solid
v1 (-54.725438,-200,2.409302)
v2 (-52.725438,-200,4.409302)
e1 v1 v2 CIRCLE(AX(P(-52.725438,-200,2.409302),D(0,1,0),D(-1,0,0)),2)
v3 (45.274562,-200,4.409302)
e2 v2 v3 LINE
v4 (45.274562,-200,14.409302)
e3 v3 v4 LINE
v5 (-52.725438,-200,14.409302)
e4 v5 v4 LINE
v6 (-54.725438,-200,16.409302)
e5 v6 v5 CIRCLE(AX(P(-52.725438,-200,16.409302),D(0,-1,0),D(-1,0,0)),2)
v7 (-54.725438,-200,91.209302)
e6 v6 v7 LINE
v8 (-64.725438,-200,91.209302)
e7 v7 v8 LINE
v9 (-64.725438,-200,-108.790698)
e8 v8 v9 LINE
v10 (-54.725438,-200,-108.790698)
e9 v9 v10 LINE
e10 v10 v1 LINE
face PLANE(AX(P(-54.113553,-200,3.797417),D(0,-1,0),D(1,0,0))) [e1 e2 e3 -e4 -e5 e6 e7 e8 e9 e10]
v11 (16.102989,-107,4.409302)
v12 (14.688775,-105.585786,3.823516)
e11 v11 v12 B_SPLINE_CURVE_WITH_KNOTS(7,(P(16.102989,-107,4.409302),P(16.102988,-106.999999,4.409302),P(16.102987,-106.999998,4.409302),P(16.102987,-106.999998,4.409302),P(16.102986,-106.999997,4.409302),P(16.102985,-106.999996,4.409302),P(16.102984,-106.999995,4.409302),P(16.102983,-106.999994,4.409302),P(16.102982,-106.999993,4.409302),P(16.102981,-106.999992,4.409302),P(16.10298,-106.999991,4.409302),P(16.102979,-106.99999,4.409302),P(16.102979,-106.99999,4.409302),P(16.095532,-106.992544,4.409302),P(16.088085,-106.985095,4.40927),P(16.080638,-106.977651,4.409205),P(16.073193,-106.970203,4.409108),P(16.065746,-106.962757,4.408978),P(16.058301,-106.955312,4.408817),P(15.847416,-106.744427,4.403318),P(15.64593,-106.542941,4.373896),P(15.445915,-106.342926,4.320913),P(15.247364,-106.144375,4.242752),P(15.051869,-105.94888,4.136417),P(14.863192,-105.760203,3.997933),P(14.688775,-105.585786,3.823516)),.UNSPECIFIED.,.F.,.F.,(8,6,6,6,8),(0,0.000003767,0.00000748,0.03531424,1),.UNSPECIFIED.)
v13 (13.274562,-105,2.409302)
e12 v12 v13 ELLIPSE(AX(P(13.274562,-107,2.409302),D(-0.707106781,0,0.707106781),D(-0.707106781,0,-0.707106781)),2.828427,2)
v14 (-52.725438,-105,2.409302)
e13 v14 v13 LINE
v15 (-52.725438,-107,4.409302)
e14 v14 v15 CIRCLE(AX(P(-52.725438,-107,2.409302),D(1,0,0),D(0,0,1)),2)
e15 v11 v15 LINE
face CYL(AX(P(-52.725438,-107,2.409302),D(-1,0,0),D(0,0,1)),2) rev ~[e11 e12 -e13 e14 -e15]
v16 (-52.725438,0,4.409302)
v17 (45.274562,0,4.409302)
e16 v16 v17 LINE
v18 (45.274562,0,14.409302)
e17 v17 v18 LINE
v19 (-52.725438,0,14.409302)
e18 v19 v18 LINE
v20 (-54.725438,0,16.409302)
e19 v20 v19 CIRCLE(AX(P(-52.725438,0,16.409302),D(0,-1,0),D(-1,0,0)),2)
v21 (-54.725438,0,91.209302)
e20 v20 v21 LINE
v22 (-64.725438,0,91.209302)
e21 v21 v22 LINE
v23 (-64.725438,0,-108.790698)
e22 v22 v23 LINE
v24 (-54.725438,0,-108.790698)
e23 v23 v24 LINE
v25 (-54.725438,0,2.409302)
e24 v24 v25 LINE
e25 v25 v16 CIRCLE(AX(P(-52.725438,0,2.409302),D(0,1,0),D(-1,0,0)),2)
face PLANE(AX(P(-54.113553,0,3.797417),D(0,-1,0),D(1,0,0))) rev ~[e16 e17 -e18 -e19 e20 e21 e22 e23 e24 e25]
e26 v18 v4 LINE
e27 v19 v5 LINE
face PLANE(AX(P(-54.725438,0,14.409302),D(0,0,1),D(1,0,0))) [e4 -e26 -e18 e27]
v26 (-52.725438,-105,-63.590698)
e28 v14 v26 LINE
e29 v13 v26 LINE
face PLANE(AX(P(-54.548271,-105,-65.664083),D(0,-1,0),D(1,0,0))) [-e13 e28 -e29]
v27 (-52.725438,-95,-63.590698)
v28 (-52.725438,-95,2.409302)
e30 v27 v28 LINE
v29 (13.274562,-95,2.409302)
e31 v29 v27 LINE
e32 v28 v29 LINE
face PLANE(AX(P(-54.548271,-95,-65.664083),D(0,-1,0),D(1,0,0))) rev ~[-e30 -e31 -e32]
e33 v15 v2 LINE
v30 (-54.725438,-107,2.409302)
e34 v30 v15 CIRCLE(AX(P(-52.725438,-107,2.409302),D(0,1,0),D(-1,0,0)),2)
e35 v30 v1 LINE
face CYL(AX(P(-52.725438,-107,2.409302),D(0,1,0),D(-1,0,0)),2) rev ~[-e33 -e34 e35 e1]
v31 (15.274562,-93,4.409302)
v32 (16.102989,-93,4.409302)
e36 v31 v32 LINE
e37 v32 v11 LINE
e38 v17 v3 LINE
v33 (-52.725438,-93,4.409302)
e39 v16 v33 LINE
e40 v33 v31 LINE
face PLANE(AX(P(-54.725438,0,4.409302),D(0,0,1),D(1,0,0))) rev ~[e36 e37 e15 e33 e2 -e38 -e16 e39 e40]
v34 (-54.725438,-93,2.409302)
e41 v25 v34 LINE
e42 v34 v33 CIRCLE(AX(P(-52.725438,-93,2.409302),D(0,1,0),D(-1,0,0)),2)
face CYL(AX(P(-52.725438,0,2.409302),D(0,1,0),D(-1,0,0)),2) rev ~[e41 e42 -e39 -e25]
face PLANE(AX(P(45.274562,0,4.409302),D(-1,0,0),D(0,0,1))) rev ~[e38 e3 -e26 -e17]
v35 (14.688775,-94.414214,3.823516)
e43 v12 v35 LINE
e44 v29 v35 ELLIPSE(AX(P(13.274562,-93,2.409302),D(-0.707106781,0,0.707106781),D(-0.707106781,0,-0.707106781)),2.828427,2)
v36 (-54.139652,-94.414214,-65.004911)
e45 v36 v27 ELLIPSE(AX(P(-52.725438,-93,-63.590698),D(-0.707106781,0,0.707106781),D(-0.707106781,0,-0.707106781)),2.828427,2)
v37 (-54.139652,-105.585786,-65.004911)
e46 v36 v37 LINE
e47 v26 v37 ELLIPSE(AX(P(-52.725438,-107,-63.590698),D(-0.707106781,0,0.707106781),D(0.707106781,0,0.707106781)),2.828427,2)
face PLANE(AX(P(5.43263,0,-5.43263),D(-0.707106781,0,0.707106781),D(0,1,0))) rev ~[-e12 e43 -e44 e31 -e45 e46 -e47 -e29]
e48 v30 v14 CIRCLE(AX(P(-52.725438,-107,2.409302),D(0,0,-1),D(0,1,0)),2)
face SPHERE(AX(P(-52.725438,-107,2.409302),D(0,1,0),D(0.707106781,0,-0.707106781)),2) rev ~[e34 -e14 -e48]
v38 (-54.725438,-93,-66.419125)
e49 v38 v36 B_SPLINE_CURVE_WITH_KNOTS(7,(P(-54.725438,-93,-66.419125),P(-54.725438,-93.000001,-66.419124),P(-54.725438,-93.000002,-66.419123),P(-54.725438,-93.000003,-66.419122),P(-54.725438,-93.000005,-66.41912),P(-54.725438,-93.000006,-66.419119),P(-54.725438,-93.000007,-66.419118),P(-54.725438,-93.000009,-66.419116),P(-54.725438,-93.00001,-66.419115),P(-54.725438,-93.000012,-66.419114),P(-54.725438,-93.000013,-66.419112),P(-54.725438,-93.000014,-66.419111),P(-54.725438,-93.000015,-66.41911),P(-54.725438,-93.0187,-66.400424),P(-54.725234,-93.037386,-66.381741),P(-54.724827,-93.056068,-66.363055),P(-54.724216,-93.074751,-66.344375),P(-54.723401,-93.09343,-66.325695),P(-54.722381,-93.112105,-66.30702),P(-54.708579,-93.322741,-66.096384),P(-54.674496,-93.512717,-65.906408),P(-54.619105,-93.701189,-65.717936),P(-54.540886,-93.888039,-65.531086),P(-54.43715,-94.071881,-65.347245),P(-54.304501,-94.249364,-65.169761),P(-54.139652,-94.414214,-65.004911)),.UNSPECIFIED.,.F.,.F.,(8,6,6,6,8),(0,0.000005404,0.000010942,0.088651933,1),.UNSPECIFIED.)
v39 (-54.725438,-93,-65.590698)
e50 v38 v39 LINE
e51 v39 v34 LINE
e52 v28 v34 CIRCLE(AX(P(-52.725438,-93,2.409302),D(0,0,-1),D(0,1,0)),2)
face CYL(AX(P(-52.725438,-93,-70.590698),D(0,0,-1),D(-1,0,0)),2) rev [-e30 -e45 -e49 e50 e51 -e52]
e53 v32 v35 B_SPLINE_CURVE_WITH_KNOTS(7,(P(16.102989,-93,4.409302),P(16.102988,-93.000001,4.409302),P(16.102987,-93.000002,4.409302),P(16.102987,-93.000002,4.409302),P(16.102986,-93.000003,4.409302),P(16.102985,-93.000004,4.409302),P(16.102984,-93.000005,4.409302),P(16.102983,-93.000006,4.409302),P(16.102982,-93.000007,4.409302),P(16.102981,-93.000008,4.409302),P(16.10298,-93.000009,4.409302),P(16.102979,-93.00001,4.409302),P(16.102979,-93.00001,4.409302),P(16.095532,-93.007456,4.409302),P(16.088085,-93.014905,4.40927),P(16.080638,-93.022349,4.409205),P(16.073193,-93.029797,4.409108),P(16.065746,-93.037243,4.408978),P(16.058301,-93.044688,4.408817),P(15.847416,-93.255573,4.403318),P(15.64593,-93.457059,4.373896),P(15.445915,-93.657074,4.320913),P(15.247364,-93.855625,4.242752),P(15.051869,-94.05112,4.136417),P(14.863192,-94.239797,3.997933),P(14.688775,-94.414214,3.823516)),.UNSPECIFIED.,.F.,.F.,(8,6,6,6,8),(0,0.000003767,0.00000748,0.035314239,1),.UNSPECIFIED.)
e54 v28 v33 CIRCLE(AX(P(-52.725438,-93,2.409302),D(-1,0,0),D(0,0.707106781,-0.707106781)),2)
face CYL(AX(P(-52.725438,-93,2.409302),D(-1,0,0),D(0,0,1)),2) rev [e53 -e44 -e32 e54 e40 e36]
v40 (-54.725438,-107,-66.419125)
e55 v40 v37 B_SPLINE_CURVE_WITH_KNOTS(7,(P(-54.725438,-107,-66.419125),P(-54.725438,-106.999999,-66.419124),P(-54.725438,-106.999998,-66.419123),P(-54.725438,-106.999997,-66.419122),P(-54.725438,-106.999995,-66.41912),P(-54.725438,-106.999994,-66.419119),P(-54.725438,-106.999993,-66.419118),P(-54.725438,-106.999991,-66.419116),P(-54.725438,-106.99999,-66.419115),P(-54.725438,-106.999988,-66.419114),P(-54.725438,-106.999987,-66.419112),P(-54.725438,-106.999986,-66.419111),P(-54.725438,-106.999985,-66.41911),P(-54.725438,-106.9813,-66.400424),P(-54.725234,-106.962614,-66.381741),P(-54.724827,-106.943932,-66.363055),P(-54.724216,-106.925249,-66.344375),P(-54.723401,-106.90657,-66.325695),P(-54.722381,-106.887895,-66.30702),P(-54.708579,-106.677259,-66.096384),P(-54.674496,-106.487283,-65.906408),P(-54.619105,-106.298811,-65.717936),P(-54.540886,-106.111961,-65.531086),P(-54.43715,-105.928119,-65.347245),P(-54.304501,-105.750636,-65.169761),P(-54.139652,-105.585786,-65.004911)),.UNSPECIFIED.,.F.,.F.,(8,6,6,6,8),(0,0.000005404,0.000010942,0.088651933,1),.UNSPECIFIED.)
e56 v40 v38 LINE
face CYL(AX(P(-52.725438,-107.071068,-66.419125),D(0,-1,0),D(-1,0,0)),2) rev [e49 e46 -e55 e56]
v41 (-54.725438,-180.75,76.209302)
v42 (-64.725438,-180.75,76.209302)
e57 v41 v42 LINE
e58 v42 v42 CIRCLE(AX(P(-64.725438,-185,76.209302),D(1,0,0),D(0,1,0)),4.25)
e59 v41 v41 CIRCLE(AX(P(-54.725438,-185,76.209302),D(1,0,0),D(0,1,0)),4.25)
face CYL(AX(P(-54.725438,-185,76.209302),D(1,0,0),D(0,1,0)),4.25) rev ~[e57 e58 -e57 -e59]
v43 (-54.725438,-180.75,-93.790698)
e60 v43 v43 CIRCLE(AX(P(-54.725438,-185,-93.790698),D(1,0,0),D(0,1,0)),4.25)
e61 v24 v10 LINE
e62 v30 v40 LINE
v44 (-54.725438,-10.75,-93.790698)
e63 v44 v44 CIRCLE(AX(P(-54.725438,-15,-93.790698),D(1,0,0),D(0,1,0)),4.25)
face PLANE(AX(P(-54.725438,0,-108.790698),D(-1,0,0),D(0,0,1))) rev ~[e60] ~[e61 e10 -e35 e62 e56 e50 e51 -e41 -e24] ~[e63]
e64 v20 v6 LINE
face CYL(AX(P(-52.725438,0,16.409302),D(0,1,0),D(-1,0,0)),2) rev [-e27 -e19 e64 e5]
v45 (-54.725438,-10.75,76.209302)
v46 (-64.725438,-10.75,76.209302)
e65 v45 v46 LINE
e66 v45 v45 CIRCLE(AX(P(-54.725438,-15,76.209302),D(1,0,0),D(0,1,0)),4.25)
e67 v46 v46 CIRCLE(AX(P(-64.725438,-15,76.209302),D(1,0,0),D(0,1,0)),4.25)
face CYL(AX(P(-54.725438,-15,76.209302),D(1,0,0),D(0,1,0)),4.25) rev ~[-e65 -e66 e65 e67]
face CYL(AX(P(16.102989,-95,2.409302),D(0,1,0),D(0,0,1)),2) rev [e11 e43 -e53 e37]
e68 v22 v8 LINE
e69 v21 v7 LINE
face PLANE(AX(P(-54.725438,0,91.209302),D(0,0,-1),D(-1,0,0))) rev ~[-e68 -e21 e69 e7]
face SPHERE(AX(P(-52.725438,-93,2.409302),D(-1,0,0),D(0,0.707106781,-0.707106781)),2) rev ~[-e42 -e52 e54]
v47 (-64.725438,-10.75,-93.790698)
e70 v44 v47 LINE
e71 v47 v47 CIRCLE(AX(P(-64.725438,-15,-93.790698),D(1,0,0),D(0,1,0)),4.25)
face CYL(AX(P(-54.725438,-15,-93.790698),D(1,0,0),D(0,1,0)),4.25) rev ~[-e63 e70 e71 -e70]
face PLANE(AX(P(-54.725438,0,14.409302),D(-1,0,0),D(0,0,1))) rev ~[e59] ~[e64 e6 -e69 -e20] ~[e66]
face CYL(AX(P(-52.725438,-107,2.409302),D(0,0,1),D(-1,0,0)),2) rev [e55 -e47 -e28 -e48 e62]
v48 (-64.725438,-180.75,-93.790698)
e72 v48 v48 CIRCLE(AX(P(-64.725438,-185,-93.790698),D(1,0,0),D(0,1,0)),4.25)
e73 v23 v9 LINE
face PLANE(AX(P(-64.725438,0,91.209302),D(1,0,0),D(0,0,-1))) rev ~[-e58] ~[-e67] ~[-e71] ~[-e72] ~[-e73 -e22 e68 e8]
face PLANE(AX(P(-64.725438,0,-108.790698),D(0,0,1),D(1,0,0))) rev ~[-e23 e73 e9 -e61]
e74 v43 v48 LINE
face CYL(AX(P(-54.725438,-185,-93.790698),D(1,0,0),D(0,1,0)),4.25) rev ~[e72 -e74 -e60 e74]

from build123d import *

# Parameters (mm, degrees)
F0_W         = 100
F0_H         = 10
F1_DEPTH     = 200
F2_W         = 10
F2_H         = 70
F3_DEPTH     = 70
F5_DEPTH     = 25
F6_R         = 4.25
F7_DEPTH     = 25
F8_DEPTH     = 25
F9_T1_DEPTH  = 200
F9_T3_DEPTH  = 93
F9_T5_DEPTH  = 93
F9_T7_DEPTH  = 10
F9_S11_W     = 2
F9_S11_H     = 2
F9_T12_DEPTH = 2
F9_S17_W     = 2
F9_S17_H     = 2
F9_T18_DEPTH = 2
F9_T24_DEPTH = 73
F9_T29_DEPTH = 73
F9_T34_DEPTH = 73
F9_T39_DEPTH = 73
F9_T45_DEPTH = 73
F9_T49_DEPTH = 12.0710678119
F9_T56_DEPTH = 12.0710678119
F9_T60_DEPTH = 73
F9_T67_DEPTH = 73
F9_T71_DEPTH = 12.0710678119
F9_T78_DEPTH = 12.0710678119
F9_T82_DEPTH = 73


# Not quite as in the source:
# - a fillet or chamfer that OpenCascade refuses, or shapes differently, is made with other operations: its cross-section is extruded or revolved along the edge and cut away or added


with BuildPart() as f1:
    # F0 (on Front) → F1 (new body)
    with BuildSketch(Plane.XZ):
        Polygon((-54.7254381291, 91.2093020976), (-64.7254381291, 91.2093020976), (-64.7254381291, -108.7906979024), (-54.7254381291, -108.7906979024), (-54.7254381291, 4.4093020976), (-54.7254381291, 14.4093020976), align=None)
        with Locations((-4.7254381291, 9.4093020976)):
            Rectangle(F0_W, F0_H)
    extrude(amount=F1_DEPTH)

    # F2 (on face) → F3 (join)
    with BuildSketch(Plane.YZ.offset(-54.7254381291)):
        with Locations((-100, -30.5906979024)):
            Rectangle(F2_W, F2_H)
    extrude(amount=F3_DEPTH)

    # F4 (on face) → F5 (cut)
    with BuildSketch(Plane.XZ.offset(105)):
        Polygon((15.2745618709, 4.4093020976), (-54.7254381291, -65.5906979024), (15.2745618709, -65.5906979024), align=None)
    extrude(amount=-F5_DEPTH, mode=Mode.SUBTRACT)

    # F6 (on face) → F7 (cut)
    with BuildSketch(Plane.YZ.offset(-54.7254381291)):
        with Locations((-15, 76.2093020976)):
            Circle(F6_R)
    extrude(amount=-F7_DEPTH, mode=Mode.SUBTRACT)

    # F6 (on face) → F8 (cut)
    with BuildSketch(Plane.YZ.offset(-54.7254381291)):
        with Locations((-185, 76.2093020976)):
            Circle(F6_R)
        with Locations((-15, 76.2093020976)):
            Circle(F6_R)
        with Locations((-185, -93.7906979024)):
            Circle(F6_R)
        with Locations((-15, -93.7906979024)):
            Circle(F6_R)
    extrude(amount=-F8_DEPTH, mode=Mode.SUBTRACT)

    # F9: fillet of radius 2 on 11 edges, made by hand

    # F9_s2 → F9_t1 (join)
    with BuildSketch(Plane.XZ):
        with BuildLine():
            ThreePointArc((-54.7254381291, 16.4093020976), (-54.1396516914, 14.9950885352), (-52.7254381291, 14.4093020976))
            Line((-52.7254381291, 14.4093020976), (-54.7254381291, 14.4093020976))
            Line((-54.7254381291, 14.4093020976), (-54.7254381291, 16.4093020976))
        make_face()
    extrude(amount=F9_T1_DEPTH)

    # F9_s4 → F9_t3 (join)
    with BuildSketch(Plane.XZ.offset(107)):
        with BuildLine():
            ThreePointArc((-54.7254381291, 2.4093020976), (-54.1396516914, 3.8235156599), (-52.7254381291, 4.4093020976))
            Line((-52.7254381291, 4.4093020976), (-54.7254381291, 4.4093020976))
            Line((-54.7254381291, 4.4093020976), (-54.7254381291, 2.4093020976))
        make_face()
    extrude(amount=F9_T3_DEPTH)

    # F9_s6 → F9_t5 (join)
    with BuildSketch(Plane.XZ):
        with BuildLine():
            ThreePointArc((-54.7254381291, 2.4093020976), (-54.1396516914, 3.8235156599), (-52.7254381291, 4.4093020976))
            Line((-52.7254381291, 4.4093020976), (-54.7254381291, 4.4093020976))
            Line((-54.7254381291, 4.4093020976), (-54.7254381291, 2.4093020976))
        make_face()
    extrude(amount=F9_T5_DEPTH)

    # F9_s8 → F9_t7 (join)
    with BuildSketch(Plane.XZ.offset(95)):
        with BuildLine():
            ThreePointArc((-54.7254381291, -66.4191250272), (-54.5731971941, -65.6537581625), (-54.1396516914, -65.0049114648))
            Line((-54.1396516914, -65.0049114648), (-54.7254381291, -65.5906979024))
            Line((-54.7254381291, -65.5906979024), (-54.7254381291, -66.4191250272))
        make_face()
        with BuildLine():
            ThreePointArc((16.1029889957, 4.4093020976), (15.3376221309, 4.2570611626), (14.6887754333, 3.8235156599))
            Line((14.6887754333, 3.8235156599), (15.2745618709, 4.4093020976))
            Line((15.2745618709, 4.4093020976), (16.1029889957, 4.4093020976))
        make_face()
    extrude(amount=F9_T7_DEPTH)


with BuildPart() as f9_tool10:
    # F9_s11 → F9_t12 (new body)
    with BuildSketch(Plane.XZ.offset(107)):
        with Locations((-53.7254381291, 3.4093020976)):
            Rectangle(F9_S11_W, F9_S11_H)
    extrude(amount=-F9_T12_DEPTH)

    # F9_s13 → F9_t14 (revolve, cut)
    with BuildSketch(Plane(origin=(-52.7254381291, -107, 2.4093020976), x_dir=(0.7071067812, 0, -0.7071067812), z_dir=(0.7071067812, 0, 0.7071067812))):
        with BuildLine():
            ThreePointArc((0, -2), (2, 0), (0, 2))
            Line((0, 2), (0, -2))
        make_face()
    revolve(axis=Axis((-52.7254381291, -107, 2.4093020976), (0, 1, 0)), mode=Mode.SUBTRACT)


with BuildPart() as f1_1:
    add(f1.part)

    # F9_t9: union F9_tool10
    add(f9_tool10.part)


with BuildPart() as f9_tool16:
    # F9_s17 → F9_t18 (new body)
    with BuildSketch(Plane.YZ.offset(-52.7254381291)):
        with Locations((-94, 3.4093020976)):
            Rectangle(F9_S17_W, F9_S17_H)
    extrude(amount=-F9_T18_DEPTH)

    # F9_s19 → F9_t20 (revolve, cut)
    with BuildSketch(Plane(origin=(-52.7254381291, -93, 2.4093020976), x_dir=(0, 0.7071067812, -0.7071067812), z_dir=(0, 0.7071067812, 0.7071067812))):
        with BuildLine():
            ThreePointArc((0, -2), (2, 0), (0, 2))
            Line((0, 2), (0, -2))
        make_face()
    revolve(axis=Axis((-52.7254381291, -93, 2.4093020976), (-1, 0, 0)), mode=Mode.SUBTRACT)


with BuildPart() as f1_2:
    add(f1_1.part)

    # F9_t15: union F9_tool16
    add(f9_tool16.part)


with BuildPart() as f9_tool22:
    # F9_s23 → F9_t24 (new body)
    with BuildSketch(Plane.XY.offset(-70.5906979024)):
        with BuildLine():
            ThreePointArc((-54.7254381291, -93), (-54.1396516914, -94.4142135624), (-52.7254381291, -95))
            Line((-52.7254381291, -95), (-54.7254381291, -95))
            Line((-54.7254381291, -95), (-54.7254381291, -93))
        make_face()
    extrude(amount=F9_T24_DEPTH)

    split(bisect_by=Plane(origin=(5.4326298867, 0, -5.4326298867), x_dir=(0, 1, 0), z_dir=(-0.7071067812, 0, 0.7071067812)), keep=Keep.TOP)


with BuildPart() as f1_3:
    add(f1_2.part)

    # F9_t21: union F9_tool22
    add(f9_tool22.part)


with BuildPart() as f9_tool27:
    # F9_s28 → F9_t29 (new body)
    with BuildSketch(Plane.XY.offset(2.4093020976)):
        with BuildLine():
            ThreePointArc((-54.7254381291, -107), (-54.1396516914, -105.5857864376), (-52.7254381291, -105))
            Line((-52.7254381291, -105), (-54.7254381291, -105))
            Line((-54.7254381291, -105), (-54.7254381291, -107))
        make_face()
    extrude(amount=-F9_T29_DEPTH)

    split(bisect_by=Plane(origin=(5.4326298867, 0, -5.4326298867), x_dir=(0, 1, 0), z_dir=(-0.7071067812, 0, 0.7071067812)), keep=Keep.TOP)


with BuildPart() as f1_4:
    add(f1_3.part)

    # F9_t26: union F9_tool27
    add(f9_tool27.part)


with BuildPart() as f9_tool32:
    # F9_s33 → F9_t34 (new body)
    with BuildSketch(Plane.YZ.offset(-52.7254381291)):
        with BuildLine():
            ThreePointArc((-93, 4.4093020976), (-94.4142135624, 3.8235156599), (-95, 2.4093020976))
            Line((-95, 2.4093020976), (-95, 4.4093020976))
            Line((-95, 4.4093020976), (-93, 4.4093020976))
        make_face()
    extrude(amount=F9_T34_DEPTH)

    split(bisect_by=Plane(origin=(5.4326298867, 0, -5.4326298867), x_dir=(0, 1, 0), z_dir=(-0.7071067812, 0, 0.7071067812)), keep=Keep.TOP)


with BuildPart() as f1_5:
    add(f1_4.part)

    # F9_t31: union F9_tool32
    add(f9_tool32.part)


with BuildPart() as f9_tool37:
    # F9_s38 → F9_t39 (new body)
    with BuildSketch(Plane.YZ.offset(-52.7254381291)):
        with BuildLine():
            ThreePointArc((-107, 4.4093020976), (-105.5857864376, 3.8235156599), (-105, 2.4093020976))
            Line((-105, 2.4093020976), (-105, 4.4093020976))
            Line((-105, 4.4093020976), (-107, 4.4093020976))
        make_face()
    extrude(amount=F9_T39_DEPTH)

    split(bisect_by=Plane(origin=(5.4326298867, 0, -5.4326298867), x_dir=(0, 1, 0), z_dir=(-0.7071067812, 0, 0.7071067812)), keep=Keep.TOP)


with BuildPart() as f1_6:
    add(f1_5.part)

    # F9_t36: union F9_tool37
    add(f9_tool37.part)


with BuildPart() as f9_tool43:
    # F9_s44 → F9_t45 (new body)
    with BuildSketch(Plane.XY.offset(-70.5906979024)):
        with BuildLine():
            ThreePointArc((-54.7254381291, -93), (-54.1396516914, -94.4142135624), (-52.7254381291, -95))
            Line((-52.7254381291, -95), (-54.7254381291, -95))
            Line((-54.7254381291, -95), (-54.7254381291, -93))
        make_face()
    extrude(amount=F9_T45_DEPTH)

    split(bisect_by=Plane(origin=(5.4326298867, 0, -5.4326298867), x_dir=(0, 1, 0), z_dir=(0.7071067812, 0, -0.7071067812)), keep=Keep.TOP)


with BuildPart() as f9_tool47:
    # F9_s48 → F9_t49 (new body)
    with BuildSketch(Plane.XZ.offset(105)):
        with BuildLine():
            ThreePointArc((-54.7254381291, -66.4191250272), (-54.5731971941, -65.6537581625), (-54.1396516914, -65.0049114648))
            Line((-54.1396516914, -65.0049114648), (-54.7254381291, -65.5906979024))
            Line((-54.7254381291, -65.5906979024), (-54.7254381291, -66.4191250272))
        make_face()
    extrude(amount=-F9_T49_DEPTH)

    split(bisect_by=Plane.XZ.offset(95), keep=Keep.BOTTOM)


with BuildPart() as f9_tool43_1:
    add(f9_tool43.part)

    # F9_t51: intersect F9_tool47
    add(f9_tool47.part, mode=Mode.INTERSECT)


with BuildPart() as f1_7:
    add(f1_6.part)

    # F9_t41: union F9_tool43
    add(f9_tool43_1.part)


with BuildPart() as f9_tool54:
    # F9_s55 → F9_t56 (new body)
    with BuildSketch(Plane.XZ.offset(107.0710678119)):
        with BuildLine():
            ThreePointArc((-54.7254381291, -66.4191250272), (-54.5731971941, -65.6537581625), (-54.1396516914, -65.0049114648))
            Line((-54.1396516914, -65.0049114648), (-54.7254381291, -65.5906979024))
            Line((-54.7254381291, -65.5906979024), (-54.7254381291, -66.4191250272))
        make_face()
    extrude(amount=-F9_T56_DEPTH)

    split(bisect_by=Plane.XZ.offset(105), keep=Keep.TOP)


with BuildPart() as f9_tool58:
    # F9_s59 → F9_t60 (new body)
    with BuildSketch(Plane.XY.offset(2.4093020976)):
        with BuildLine():
            ThreePointArc((-54.7254381291, -107), (-54.1396516914, -105.5857864376), (-52.7254381291, -105))
            Line((-52.7254381291, -105), (-54.7254381291, -105))
            Line((-54.7254381291, -105), (-54.7254381291, -107))
        make_face()
    extrude(amount=-F9_T60_DEPTH)

    split(bisect_by=Plane(origin=(5.4326298867, 0, -5.4326298867), x_dir=(0, 1, 0), z_dir=(0.7071067812, 0, -0.7071067812)), keep=Keep.TOP)


with BuildPart() as f9_tool54_1:
    add(f9_tool54.part)

    # F9_t62: intersect F9_tool58
    add(f9_tool58.part, mode=Mode.INTERSECT)


with BuildPart() as f1_8:
    add(f1_7.part)

    # F9_t52: union F9_tool54
    add(f9_tool54_1.part)


with BuildPart() as f9_tool65:
    # F9_s66 → F9_t67 (new body)
    with BuildSketch(Plane.YZ.offset(-52.7254381291)):
        with BuildLine():
            ThreePointArc((-93, 4.4093020976), (-94.4142135624, 3.8235156599), (-95, 2.4093020976))
            Line((-95, 2.4093020976), (-95, 4.4093020976))
            Line((-95, 4.4093020976), (-93, 4.4093020976))
        make_face()
    extrude(amount=F9_T67_DEPTH)

    split(bisect_by=Plane(origin=(5.4326298867, 0, -5.4326298867), x_dir=(0, 1, 0), z_dir=(0.7071067812, 0, -0.7071067812)), keep=Keep.TOP)


with BuildPart() as f9_tool69:
    # F9_s70 → F9_t71 (new body)
    with BuildSketch(Plane.XZ.offset(92.9289321881)):
        with BuildLine():
            ThreePointArc((16.1029889957, 4.4093020976), (15.3376221309, 4.2570611626), (14.6887754333, 3.8235156599))
            Line((14.6887754333, 3.8235156599), (15.2745618709, 4.4093020976))
            Line((15.2745618709, 4.4093020976), (16.1029889957, 4.4093020976))
        make_face()
    extrude(amount=F9_T71_DEPTH)

    split(bisect_by=Plane.XZ.offset(95), keep=Keep.BOTTOM)


with BuildPart() as f9_tool65_1:
    add(f9_tool65.part)

    # F9_t73: intersect F9_tool69
    add(f9_tool69.part, mode=Mode.INTERSECT)


with BuildPart() as f1_9:
    add(f1_8.part)

    # F9_t63: union F9_tool65
    add(f9_tool65_1.part)


with BuildPart() as f9_tool76:
    # F9_s77 → F9_t78 (new body)
    with BuildSketch(Plane.XZ.offset(95)):
        with BuildLine():
            ThreePointArc((16.1029889957, 4.4093020976), (15.3376221309, 4.2570611626), (14.6887754333, 3.8235156599))
            Line((14.6887754333, 3.8235156599), (15.2745618709, 4.4093020976))
            Line((15.2745618709, 4.4093020976), (16.1029889957, 4.4093020976))
        make_face()
    extrude(amount=F9_T78_DEPTH)

    split(bisect_by=Plane.XZ.offset(105), keep=Keep.TOP)


with BuildPart() as f9_tool80:
    # F9_s81 → F9_t82 (new body)
    with BuildSketch(Plane.YZ.offset(-52.7254381291)):
        with BuildLine():
            ThreePointArc((-107, 4.4093020976), (-105.5857864376, 3.8235156599), (-105, 2.4093020976))
            Line((-105, 2.4093020976), (-105, 4.4093020976))
            Line((-105, 4.4093020976), (-107, 4.4093020976))
        make_face()
    extrude(amount=F9_T82_DEPTH)

    split(bisect_by=Plane(origin=(5.4326298867, 0, -5.4326298867), x_dir=(0, 1, 0), z_dir=(0.7071067812, 0, -0.7071067812)), keep=Keep.TOP)


with BuildPart() as f9_tool76_1:
    add(f9_tool76.part)

    # F9_t84: intersect F9_tool80
    add(f9_tool80.part, mode=Mode.INTERSECT)


with BuildPart() as f1_10:
    add(f1_9.part)

    # F9_t74: union F9_tool76
    add(f9_tool76_1.part)


solid = f1_10.part
